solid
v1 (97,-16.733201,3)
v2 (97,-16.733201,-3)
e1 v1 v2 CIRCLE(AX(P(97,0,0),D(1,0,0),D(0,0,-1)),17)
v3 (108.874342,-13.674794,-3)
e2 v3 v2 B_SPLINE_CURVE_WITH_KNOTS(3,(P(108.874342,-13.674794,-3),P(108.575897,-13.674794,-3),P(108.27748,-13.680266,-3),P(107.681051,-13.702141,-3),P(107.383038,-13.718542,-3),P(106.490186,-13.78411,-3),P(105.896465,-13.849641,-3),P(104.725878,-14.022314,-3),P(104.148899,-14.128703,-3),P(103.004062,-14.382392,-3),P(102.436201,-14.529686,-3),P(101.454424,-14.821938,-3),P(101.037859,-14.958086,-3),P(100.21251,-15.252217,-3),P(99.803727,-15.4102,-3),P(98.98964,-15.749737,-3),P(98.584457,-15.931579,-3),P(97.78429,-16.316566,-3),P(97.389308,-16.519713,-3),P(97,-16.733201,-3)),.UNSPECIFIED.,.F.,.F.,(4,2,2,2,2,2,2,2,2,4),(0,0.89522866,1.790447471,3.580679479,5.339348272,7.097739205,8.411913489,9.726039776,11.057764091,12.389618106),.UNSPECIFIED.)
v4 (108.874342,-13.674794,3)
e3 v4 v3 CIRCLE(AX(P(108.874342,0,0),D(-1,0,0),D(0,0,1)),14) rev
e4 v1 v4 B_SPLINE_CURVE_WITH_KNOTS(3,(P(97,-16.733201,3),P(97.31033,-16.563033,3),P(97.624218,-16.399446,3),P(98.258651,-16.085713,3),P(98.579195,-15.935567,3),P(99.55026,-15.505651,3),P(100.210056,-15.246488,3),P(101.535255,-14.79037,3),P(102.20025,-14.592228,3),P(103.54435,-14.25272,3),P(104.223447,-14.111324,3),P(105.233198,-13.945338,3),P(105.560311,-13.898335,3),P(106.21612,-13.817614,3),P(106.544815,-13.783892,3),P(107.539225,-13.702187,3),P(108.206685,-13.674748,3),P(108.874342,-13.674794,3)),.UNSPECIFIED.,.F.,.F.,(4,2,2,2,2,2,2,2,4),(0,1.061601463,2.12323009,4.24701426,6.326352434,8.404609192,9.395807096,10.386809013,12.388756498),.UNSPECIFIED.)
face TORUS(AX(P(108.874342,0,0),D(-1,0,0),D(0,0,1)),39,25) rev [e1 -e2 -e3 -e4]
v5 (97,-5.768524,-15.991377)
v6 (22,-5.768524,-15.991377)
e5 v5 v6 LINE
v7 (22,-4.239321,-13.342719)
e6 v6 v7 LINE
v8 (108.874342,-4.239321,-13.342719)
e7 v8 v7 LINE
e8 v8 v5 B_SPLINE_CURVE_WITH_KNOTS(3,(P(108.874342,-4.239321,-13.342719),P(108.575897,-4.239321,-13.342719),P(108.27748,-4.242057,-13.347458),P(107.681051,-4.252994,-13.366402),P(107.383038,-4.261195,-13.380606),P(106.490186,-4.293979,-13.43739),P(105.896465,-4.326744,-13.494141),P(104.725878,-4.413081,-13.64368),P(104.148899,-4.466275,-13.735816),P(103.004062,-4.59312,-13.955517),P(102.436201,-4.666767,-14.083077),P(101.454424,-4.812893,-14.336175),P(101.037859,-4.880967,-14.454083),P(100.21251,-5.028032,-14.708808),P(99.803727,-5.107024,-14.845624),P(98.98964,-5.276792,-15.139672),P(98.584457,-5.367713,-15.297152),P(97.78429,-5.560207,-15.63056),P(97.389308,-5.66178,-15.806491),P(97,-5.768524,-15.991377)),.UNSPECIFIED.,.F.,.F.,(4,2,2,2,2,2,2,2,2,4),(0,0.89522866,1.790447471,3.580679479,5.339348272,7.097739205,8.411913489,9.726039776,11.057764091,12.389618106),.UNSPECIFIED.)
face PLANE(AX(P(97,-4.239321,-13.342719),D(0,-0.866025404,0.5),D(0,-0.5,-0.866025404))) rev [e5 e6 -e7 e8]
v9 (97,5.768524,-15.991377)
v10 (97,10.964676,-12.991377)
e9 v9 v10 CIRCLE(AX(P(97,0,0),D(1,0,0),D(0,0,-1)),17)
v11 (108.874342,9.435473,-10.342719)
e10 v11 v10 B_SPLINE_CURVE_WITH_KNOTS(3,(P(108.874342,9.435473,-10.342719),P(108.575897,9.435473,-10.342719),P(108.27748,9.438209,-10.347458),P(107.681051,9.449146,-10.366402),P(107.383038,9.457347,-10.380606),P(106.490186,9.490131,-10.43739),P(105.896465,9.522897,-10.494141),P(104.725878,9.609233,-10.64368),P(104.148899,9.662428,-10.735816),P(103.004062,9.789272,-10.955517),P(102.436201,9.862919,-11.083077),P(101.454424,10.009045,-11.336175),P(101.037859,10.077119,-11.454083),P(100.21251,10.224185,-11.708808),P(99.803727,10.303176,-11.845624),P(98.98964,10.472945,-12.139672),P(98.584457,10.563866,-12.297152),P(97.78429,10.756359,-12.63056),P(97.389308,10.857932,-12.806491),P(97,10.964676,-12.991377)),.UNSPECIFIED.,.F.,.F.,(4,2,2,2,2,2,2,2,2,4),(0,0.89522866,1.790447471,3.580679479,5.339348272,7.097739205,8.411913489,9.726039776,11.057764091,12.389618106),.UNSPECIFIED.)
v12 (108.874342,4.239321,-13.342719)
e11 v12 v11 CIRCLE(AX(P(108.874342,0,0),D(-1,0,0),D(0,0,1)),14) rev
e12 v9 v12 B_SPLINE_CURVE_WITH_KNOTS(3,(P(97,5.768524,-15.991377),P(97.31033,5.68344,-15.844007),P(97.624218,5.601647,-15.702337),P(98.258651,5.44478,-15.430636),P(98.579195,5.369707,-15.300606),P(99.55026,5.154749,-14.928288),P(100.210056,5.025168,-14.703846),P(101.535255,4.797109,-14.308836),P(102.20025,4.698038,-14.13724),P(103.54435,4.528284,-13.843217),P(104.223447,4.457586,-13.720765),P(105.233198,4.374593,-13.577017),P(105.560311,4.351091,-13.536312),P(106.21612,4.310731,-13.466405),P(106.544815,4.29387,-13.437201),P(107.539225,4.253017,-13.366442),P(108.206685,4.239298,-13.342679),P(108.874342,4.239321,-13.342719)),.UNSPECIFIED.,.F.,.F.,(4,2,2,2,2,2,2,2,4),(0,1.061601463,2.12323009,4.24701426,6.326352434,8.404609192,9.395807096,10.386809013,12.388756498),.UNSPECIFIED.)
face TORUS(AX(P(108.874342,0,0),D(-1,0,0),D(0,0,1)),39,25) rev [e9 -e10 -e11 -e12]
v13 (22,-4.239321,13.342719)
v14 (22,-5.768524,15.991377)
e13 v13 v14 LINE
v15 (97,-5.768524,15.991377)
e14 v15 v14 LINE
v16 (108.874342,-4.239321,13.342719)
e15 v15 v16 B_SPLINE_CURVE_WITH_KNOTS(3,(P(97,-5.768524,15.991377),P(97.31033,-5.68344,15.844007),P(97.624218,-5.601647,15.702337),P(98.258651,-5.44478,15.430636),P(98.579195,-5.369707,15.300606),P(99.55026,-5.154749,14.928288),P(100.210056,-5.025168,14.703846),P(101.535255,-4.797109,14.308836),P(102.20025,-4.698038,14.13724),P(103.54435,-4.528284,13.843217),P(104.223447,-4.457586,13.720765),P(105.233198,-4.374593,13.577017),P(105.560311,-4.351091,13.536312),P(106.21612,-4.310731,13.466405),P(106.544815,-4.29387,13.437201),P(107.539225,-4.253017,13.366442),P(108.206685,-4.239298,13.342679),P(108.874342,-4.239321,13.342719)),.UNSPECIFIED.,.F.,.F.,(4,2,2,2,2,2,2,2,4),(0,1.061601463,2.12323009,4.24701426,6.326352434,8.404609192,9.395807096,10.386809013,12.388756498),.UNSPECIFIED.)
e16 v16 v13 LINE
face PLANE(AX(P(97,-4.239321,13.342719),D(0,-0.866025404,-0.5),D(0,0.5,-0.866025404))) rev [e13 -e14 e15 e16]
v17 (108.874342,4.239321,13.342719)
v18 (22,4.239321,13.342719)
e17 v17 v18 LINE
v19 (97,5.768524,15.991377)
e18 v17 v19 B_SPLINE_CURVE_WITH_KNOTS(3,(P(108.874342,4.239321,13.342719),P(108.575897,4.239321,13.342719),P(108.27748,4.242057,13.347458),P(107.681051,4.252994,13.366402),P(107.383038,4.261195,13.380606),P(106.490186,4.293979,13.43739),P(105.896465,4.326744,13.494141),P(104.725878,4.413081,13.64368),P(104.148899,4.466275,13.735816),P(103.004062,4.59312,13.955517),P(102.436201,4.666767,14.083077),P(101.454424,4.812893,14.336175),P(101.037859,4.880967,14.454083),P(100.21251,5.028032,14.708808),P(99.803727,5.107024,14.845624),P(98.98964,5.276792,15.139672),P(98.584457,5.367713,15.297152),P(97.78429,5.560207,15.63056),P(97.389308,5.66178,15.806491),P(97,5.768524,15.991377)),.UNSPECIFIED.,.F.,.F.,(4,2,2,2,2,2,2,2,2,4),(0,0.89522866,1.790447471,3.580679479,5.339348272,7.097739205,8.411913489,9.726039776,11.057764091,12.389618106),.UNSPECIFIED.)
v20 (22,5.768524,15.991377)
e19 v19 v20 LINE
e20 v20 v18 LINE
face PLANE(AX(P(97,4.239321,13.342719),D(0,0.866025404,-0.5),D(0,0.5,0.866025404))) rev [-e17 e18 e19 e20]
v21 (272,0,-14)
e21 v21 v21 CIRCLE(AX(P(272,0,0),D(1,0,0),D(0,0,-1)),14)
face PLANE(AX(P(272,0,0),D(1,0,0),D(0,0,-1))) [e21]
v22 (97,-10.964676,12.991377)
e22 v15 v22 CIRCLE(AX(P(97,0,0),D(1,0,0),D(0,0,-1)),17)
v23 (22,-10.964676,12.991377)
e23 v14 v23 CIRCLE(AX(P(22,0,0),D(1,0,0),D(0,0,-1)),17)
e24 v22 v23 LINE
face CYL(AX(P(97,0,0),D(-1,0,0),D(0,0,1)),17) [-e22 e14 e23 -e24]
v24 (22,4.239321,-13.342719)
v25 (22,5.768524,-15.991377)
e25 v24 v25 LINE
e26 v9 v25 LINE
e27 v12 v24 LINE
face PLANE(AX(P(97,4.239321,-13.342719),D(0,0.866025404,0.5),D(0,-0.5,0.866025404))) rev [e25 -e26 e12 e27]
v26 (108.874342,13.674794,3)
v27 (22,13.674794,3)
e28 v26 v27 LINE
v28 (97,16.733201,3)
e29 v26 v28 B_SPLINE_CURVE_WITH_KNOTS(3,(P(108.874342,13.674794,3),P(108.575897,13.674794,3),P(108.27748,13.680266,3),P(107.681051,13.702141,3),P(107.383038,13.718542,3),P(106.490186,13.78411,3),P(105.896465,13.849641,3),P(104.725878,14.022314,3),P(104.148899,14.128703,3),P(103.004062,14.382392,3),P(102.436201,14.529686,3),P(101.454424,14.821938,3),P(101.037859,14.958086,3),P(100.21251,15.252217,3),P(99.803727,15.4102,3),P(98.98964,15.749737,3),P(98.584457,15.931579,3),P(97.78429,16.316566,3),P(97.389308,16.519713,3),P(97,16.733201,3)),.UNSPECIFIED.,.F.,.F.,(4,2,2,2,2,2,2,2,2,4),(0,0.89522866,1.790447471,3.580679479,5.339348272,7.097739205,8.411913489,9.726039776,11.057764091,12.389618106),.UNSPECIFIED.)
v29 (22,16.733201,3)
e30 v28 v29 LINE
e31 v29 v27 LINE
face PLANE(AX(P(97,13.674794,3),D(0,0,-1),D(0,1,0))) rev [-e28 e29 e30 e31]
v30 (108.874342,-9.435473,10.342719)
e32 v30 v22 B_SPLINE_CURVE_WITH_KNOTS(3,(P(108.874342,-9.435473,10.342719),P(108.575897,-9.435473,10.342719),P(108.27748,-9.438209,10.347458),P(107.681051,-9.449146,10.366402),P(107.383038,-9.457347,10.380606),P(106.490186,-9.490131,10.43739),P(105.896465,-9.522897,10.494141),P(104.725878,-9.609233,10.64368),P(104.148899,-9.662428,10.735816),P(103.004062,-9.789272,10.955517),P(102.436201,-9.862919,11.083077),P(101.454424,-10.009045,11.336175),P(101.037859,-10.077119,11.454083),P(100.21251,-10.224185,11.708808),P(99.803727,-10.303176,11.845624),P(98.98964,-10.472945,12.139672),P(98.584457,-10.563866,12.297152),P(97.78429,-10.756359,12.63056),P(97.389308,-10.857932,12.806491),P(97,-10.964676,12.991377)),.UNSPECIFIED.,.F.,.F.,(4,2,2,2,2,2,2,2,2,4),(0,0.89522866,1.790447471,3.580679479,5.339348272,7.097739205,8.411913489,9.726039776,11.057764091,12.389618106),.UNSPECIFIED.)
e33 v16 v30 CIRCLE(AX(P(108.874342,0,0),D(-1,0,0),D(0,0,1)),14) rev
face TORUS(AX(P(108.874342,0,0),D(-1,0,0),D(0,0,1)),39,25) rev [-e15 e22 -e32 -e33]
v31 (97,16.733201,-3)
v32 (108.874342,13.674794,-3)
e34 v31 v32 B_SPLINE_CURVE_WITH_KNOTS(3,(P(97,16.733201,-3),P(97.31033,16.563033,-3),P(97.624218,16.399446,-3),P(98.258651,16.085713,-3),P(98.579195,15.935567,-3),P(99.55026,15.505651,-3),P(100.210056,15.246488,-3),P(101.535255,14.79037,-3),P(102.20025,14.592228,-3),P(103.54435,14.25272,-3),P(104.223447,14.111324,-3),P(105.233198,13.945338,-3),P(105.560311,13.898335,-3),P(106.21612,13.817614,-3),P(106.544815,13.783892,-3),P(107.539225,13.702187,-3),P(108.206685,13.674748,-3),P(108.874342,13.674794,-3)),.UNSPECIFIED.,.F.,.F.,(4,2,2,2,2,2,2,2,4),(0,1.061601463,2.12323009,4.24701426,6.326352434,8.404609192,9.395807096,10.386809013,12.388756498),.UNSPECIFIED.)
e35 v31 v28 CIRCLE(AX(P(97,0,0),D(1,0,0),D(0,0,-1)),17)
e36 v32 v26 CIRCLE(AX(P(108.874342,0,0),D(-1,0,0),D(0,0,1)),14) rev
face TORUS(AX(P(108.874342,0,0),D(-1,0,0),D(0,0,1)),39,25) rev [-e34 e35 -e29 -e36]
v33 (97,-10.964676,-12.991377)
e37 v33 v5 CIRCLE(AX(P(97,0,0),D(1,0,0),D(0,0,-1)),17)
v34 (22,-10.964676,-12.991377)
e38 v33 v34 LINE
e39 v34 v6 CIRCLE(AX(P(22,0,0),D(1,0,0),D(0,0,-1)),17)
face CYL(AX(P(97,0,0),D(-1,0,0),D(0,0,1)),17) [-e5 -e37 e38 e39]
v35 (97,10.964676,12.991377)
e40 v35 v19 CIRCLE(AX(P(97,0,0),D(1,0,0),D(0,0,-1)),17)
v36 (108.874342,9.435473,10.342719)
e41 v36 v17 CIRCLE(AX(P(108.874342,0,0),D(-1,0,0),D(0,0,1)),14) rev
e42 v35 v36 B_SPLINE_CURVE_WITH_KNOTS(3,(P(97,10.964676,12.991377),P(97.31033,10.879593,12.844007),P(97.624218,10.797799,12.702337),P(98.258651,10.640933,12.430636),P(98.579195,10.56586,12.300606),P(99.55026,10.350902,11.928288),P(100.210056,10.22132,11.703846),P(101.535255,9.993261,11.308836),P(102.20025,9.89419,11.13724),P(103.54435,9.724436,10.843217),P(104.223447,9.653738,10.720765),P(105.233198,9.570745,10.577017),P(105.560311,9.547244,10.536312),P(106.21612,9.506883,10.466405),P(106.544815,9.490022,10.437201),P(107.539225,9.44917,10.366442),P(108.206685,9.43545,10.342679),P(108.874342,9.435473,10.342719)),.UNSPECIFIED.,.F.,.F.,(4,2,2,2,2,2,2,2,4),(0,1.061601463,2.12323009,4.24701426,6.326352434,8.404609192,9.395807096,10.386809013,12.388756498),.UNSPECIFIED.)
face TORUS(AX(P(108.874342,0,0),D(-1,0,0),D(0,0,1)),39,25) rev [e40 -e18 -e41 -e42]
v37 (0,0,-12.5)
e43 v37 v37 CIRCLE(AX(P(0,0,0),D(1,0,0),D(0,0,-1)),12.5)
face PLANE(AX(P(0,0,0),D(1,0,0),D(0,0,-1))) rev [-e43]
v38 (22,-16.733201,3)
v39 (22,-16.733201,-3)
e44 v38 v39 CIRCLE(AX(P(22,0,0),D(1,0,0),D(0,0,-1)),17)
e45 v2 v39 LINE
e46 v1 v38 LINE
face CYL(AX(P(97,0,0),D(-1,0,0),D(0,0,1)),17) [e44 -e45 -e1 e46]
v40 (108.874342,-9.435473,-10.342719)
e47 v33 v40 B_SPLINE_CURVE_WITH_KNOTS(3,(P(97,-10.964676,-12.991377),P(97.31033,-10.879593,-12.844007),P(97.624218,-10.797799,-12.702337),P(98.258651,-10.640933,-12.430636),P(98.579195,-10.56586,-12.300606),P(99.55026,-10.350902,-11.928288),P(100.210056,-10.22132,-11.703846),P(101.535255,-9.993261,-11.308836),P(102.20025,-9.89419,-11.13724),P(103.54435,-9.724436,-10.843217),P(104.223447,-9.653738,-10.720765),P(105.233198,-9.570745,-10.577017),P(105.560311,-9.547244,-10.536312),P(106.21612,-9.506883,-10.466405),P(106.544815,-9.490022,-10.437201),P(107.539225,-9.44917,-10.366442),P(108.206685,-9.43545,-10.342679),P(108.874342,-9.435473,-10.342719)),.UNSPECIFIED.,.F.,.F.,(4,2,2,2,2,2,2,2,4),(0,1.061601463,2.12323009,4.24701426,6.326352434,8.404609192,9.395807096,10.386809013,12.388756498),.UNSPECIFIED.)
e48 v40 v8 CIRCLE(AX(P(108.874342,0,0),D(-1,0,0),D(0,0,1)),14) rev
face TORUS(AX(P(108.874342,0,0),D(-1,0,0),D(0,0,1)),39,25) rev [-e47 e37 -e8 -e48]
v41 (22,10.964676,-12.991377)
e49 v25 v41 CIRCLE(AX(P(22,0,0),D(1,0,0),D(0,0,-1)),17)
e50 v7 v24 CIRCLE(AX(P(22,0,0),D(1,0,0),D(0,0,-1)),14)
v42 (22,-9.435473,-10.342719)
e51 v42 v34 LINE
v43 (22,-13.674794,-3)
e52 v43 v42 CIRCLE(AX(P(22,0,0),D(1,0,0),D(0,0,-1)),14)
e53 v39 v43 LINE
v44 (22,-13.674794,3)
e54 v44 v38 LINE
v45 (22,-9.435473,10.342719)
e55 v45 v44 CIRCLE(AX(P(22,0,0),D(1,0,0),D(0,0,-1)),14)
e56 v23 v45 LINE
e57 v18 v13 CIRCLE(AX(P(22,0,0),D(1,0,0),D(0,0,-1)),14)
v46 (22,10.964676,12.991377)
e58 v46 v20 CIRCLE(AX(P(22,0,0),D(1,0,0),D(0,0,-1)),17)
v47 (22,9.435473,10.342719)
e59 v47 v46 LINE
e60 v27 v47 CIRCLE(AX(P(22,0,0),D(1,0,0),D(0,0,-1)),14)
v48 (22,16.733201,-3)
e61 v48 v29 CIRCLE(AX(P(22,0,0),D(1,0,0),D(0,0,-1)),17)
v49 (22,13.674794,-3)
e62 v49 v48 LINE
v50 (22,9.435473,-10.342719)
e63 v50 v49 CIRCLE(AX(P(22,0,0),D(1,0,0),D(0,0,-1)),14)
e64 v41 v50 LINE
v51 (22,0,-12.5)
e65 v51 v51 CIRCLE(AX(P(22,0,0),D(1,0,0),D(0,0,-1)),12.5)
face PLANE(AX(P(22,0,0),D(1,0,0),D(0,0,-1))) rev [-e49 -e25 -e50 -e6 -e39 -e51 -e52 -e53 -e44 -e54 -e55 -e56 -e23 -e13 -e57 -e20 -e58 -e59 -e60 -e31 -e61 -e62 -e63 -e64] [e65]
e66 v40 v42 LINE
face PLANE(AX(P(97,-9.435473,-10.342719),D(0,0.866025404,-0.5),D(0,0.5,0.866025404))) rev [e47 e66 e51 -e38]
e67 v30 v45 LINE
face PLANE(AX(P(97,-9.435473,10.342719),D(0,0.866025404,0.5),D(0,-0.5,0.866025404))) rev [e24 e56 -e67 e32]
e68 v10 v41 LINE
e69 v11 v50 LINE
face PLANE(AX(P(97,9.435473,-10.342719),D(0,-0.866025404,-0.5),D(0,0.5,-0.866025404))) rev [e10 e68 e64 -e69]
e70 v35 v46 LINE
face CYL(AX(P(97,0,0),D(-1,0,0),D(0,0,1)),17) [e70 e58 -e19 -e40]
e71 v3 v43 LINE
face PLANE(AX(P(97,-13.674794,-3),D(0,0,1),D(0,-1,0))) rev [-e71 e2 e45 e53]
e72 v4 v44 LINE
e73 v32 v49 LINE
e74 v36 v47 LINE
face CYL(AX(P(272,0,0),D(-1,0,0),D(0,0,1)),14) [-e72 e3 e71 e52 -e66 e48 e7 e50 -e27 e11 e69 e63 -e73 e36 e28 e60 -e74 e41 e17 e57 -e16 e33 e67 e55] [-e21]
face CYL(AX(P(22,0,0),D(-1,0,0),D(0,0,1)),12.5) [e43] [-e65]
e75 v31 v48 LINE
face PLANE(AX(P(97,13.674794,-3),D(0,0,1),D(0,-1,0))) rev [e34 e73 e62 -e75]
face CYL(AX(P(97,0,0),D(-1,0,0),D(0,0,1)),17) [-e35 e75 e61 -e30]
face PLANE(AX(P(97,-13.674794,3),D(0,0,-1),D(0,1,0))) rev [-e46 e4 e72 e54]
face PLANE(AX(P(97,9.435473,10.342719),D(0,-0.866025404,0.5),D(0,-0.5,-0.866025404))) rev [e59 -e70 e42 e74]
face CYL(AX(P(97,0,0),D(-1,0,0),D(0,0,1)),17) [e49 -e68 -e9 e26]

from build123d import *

# Parameters (mm, degrees)
SKETCH1_R           = 12.5
BOSS_EXTRUDE1_DEPTH = 22
SKETCH3_R           = 14
BOSS_EXTRUDE2_DEPTH = 250
BOSS_EXTRUDE3_DEPTH = 75
FILLET3_R           = 25


with BuildPart() as part:
    # Sketch1 → Boss-Extrude1 (new body)
    with BuildSketch(Plane(origin=(0, 0, 0), x_dir=(0, 0, -1), z_dir=(1, 0, 0))):
        Circle(SKETCH1_R)
    extrude(amount=BOSS_EXTRUDE1_DEPTH)

    # Sketch3 → Boss-Extrude2 (add)
    with BuildSketch(Plane(origin=(22, 0, 0), x_dir=(0, 0, -1), z_dir=(1, 0, 0))):
        Circle(SKETCH3_R)
    extrude(amount=BOSS_EXTRUDE2_DEPTH)

    # Sketch2 → Boss-Extrude3 (add)
    with BuildSketch(Plane(origin=(22, 0, 0), x_dir=(0, 0, -1), z_dir=(1, 0, 0))):
        with BuildLine():
            Line((-13.342719282, -4.239320954), (-15.991376746, -5.768524054))
            ThreePointArc((-15.991376746, -5.768524054), (-14.722431864, -8.5), (-12.991376746, -10.964676477))
            Line((-12.991376746, -10.964676477), (-10.342719282, -9.435473377))
            ThreePointArc((-10.342719282, -9.435473377), (-7, -12.124355653), (-3, -13.674794331))
            Line((-3, -13.674794331), (-3, -16.733200531))
            ThreePointArc((-3, -16.733200531), (0, -17), (3, -16.733200531))
            Line((3, -16.733200531), (3, -13.674794331))
            ThreePointArc((3, -13.674794331), (7, -12.124355653), (10.342719282, -9.435473377))
            Line((10.342719282, -9.435473377), (12.991376746, -10.964676477))
            ThreePointArc((12.991376746, -10.964676477), (14.722431864, -8.5), (15.991376746, -5.768524054))
            Line((15.991376746, -5.768524054), (13.342719282, -4.239320954))
            ThreePointArc((13.342719282, -4.239320954), (14, 0), (13.342719282, 4.239320954))
            Line((13.342719282, 4.239320954), (15.991376746, 5.768524054))
            ThreePointArc((15.991376746, 5.768524054), (14.722431864, 8.5), (12.991376746, 10.964676477))
            Line((12.991376746, 10.964676477), (10.342719282, 9.435473377))
            ThreePointArc((10.342719282, 9.435473377), (7, 12.124355653), (3, 13.674794331))
            Line((3, 13.674794331), (3, 16.733200531))
            ThreePointArc((3, 16.733200531), (0, 17), (-3, 16.733200531))
            Line((-3, 16.733200531), (-3, 13.674794331))
            ThreePointArc((-3, 13.674794331), (-7, 12.124355653), (-10.342719282, 9.435473377))
            Line((-10.342719282, 9.435473377), (-12.991376746, 10.964676477))
            ThreePointArc((-12.991376746, 10.964676477), (-14.722431864, 8.5), (-15.991376746, 5.768524054))
            Line((-15.991376746, 5.768524054), (-13.342719282, 4.239320954))
            ThreePointArc((-13.342719282, 4.239320954), (-14, 0), (-13.342719282, -4.239320954))
        make_face()
    extrude(amount=BOSS_EXTRUDE3_DEPTH)

    # Fillet3
    # the kernel refuses this fillet: 25 mm, written as the material it adds along each edge
    with BuildSketch(Plane(origin=(97, 0, 0), x_dir=(0, 0.27784568580579977, 0.960625720496336), z_dir=(0, -0.960625720496336, 0.27784568580579977))) as fillet3_piece_1_section:
        with BuildLine():
            CenterArc((39, -11.874342087), FILLET3_R, 151.642363424, 28.357636576)
            Line((17, 0), (14, 0))
            Line((14, 0), (14, -11.874342087))
        make_face()
    fillet3_piece_1 = revolve(axis=Axis((97, 0, 0), (-1, 0, 0)), revolution_arc=267.736659013, mode=Mode.PRIVATE)
    fillet3_piece_1 = split(fillet3_piece_1, bisect_by=Plane(origin=(97, 2.598076211, -1.5), z_dir=(0, -0.8660254037844357, 0.5000000000000051)), keep=Keep.TOP, mode=Mode.PRIVATE)
    fillet3_piece_1 = split(fillet3_piece_1, bisect_by=Plane(origin=(97, -2.598076211, 1.5), z_dir=(0, 0.8660254037844359, -0.5000000000000047)), keep=Keep.TOP, mode=Mode.PRIVATE)
    add(fillet3_piece_1)
    with BuildSketch(Plane(origin=(97, 0, 0), x_dir=(0, 0.27784568580579977, 0.960625720496336), z_dir=(0, -0.960625720496336, 0.27784568580579977))) as fillet3_piece_2_section:
        with BuildLine():
            CenterArc((39, -11.874342087), FILLET3_R, 151.642363424, 28.357636576)
            Line((17, 0), (14, 0))
            Line((14, 0), (14, -11.874342087))
        make_face()
    fillet3_piece_2 = revolve(axis=Axis((97, 0, 0), (-1, 0, 0)), revolution_arc=267.736659013, mode=Mode.PRIVATE)
    fillet3_piece_2 = split(fillet3_piece_2, bisect_by=Plane(origin=(97, 0, -3), z_dir=(0, 0, 1)), keep=Keep.TOP, mode=Mode.PRIVATE)
    fillet3_piece_2 = split(fillet3_piece_2, bisect_by=Plane(origin=(97, 0, 3), z_dir=(0, 0, -1)), keep=Keep.TOP, mode=Mode.PRIVATE)
    add(fillet3_piece_2)
    with BuildSketch(Plane(origin=(97, 0, 0), x_dir=(0, 0.27784568580579977, 0.960625720496336), z_dir=(0, -0.960625720496336, 0.27784568580579977))) as fillet3_piece_3_section:
        with BuildLine():
            CenterArc((39, -11.874342087), FILLET3_R, 151.642363424, 28.357636576)
            Line((17, 0), (14, 0))
            Line((14, 0), (14, -11.874342087))
        make_face()
    fillet3_piece_3 = revolve(axis=Axis((97, 0, 0), (-1, 0, 0)), revolution_arc=267.736659013, mode=Mode.PRIVATE)
    fillet3_piece_3 = split(fillet3_piece_3, bisect_by=Plane(origin=(97, -2.598076211, -1.5), z_dir=(0, 0.8660254037844438, 0.4999999999999911)), keep=Keep.TOP, mode=Mode.PRIVATE)
    fillet3_piece_3 = split(fillet3_piece_3, bisect_by=Plane(origin=(97, 2.598076211, 1.5), z_dir=(0, -0.8660254037844435, -0.49999999999999156)), keep=Keep.TOP, mode=Mode.PRIVATE)
    add(fillet3_piece_3)
    with BuildSketch(Plane(origin=(97, 0, 0), x_dir=(0, 0.9708491203814568, 0.23969143800843562), z_dir=(0, -0.23969143800843562, 0.9708491203814568))) as fillet3_piece_4_section:
        with BuildLine():
            CenterArc((39, -11.874342087), FILLET3_R, 151.642363424, 28.357636576)
            Line((17, 0), (14, 0))
            Line((14, 0), (14, -11.874342087))
        make_face()
    fillet3_piece_4 = revolve(axis=Axis((97, 0, 0), (-1, 0, 0)), revolution_arc=267.736659013, mode=Mode.PRIVATE)
    fillet3_piece_4 = split(fillet3_piece_4, bisect_by=Plane(origin=(97, 0, -3), z_dir=(0, 0, 1)), keep=Keep.TOP, mode=Mode.PRIVATE)
    fillet3_piece_4 = split(fillet3_piece_4, bisect_by=Plane(origin=(97, 0, 3), z_dir=(0, 0, -1)), keep=Keep.TOP, mode=Mode.PRIVATE)
    add(fillet3_piece_4)
    with BuildSketch(Plane(origin=(97, 0, 0), x_dir=(0, 0.9708491203814568, 0.23969143800843562), z_dir=(0, -0.23969143800843562, 0.9708491203814568))) as fillet3_piece_5_section:
        with BuildLine():
            CenterArc((39, -11.874342087), FILLET3_R, 151.642363424, 28.357636576)
            Line((17, 0), (14, 0))
            Line((14, 0), (14, -11.874342087))
        make_face()
    fillet3_piece_5 = revolve(axis=Axis((97, 0, 0), (-1, 0, 0)), revolution_arc=267.736659013, mode=Mode.PRIVATE)
    fillet3_piece_5 = split(fillet3_piece_5, bisect_by=Plane(origin=(97, -2.598076211, -1.5), z_dir=(0, 0.8660254037844438, 0.4999999999999911)), keep=Keep.TOP, mode=Mode.PRIVATE)
    fillet3_piece_5 = split(fillet3_piece_5, bisect_by=Plane(origin=(97, 2.598076211, 1.5), z_dir=(0, -0.8660254037844435, -0.49999999999999156)), keep=Keep.TOP, mode=Mode.PRIVATE)
    add(fillet3_piece_5)
    with BuildSketch(Plane(origin=(97, 0, 0), x_dir=(0, 0.9708491203814568, 0.23969143800843562), z_dir=(0, -0.23969143800843562, 0.9708491203814568))) as fillet3_piece_6_section:
        with BuildLine():
            CenterArc((39, -11.874342087), FILLET3_R, 151.642363424, 28.357636576)
            Line((17, 0), (14, 0))
            Line((14, 0), (14, -11.874342087))
        make_face()
    fillet3_piece_6 = revolve(axis=Axis((97, 0, 0), (-1, 0, 0)), revolution_arc=267.736659013, mode=Mode.PRIVATE)
    fillet3_piece_6 = split(fillet3_piece_6, bisect_by=Plane(origin=(97, -2.598076211, 1.5), z_dir=(0, 0.8660254037844325, -0.5000000000000107)), keep=Keep.TOP, mode=Mode.PRIVATE)
    fillet3_piece_6 = split(fillet3_piece_6, bisect_by=Plane(origin=(97, 2.598076211, -1.5), z_dir=(0, -0.8660254037844329, 0.5000000000000101)), keep=Keep.TOP, mode=Mode.PRIVATE)
    add(fillet3_piece_6)
    with BuildSketch(Plane(origin=(97, 0, 0), x_dir=(0, 0.6930034345756666, -0.7209342824878907), z_dir=(0, 0.7209342824878907, 0.6930034345756666))) as fillet3_piece_7_section:
        with BuildLine():
            CenterArc((39, -11.874342087), FILLET3_R, 151.642363424, 28.357636576)
            Line((17, 0), (14, 0))
            Line((14, 0), (14, -11.874342087))
        make_face()
    fillet3_piece_7 = revolve(axis=Axis((97, 0, 0), (-1, 0, 0)), revolution_arc=267.736659013, mode=Mode.PRIVATE)
    fillet3_piece_7 = split(fillet3_piece_7, bisect_by=Plane(origin=(97, -2.598076211, -1.5), z_dir=(0, 0.8660254037844438, 0.4999999999999911)), keep=Keep.TOP, mode=Mode.PRIVATE)
    fillet3_piece_7 = split(fillet3_piece_7, bisect_by=Plane(origin=(97, 2.598076211, 1.5), z_dir=(0, -0.8660254037844435, -0.49999999999999156)), keep=Keep.TOP, mode=Mode.PRIVATE)
    add(fillet3_piece_7)
    with BuildSketch(Plane(origin=(97, 0, 0), x_dir=(0, 0.6930034345756666, -0.7209342824878907), z_dir=(0, 0.7209342824878907, 0.6930034345756666))) as fillet3_piece_8_section:
        with BuildLine():
            CenterArc((39, -11.874342087), FILLET3_R, 151.642363424, 28.357636576)
            Line((17, 0), (14, 0))
            Line((14, 0), (14, -11.874342087))
        make_face()
    fillet3_piece_8 = revolve(axis=Axis((97, 0, 0), (-1, 0, 0)), revolution_arc=267.736659013, mode=Mode.PRIVATE)
    fillet3_piece_8 = split(fillet3_piece_8, bisect_by=Plane(origin=(97, 2.598076211, -1.5), z_dir=(0, -0.8660254037844357, 0.5000000000000051)), keep=Keep.TOP, mode=Mode.PRIVATE)
    fillet3_piece_8 = split(fillet3_piece_8, bisect_by=Plane(origin=(97, -2.598076211, 1.5), z_dir=(0, 0.8660254037844359, -0.5000000000000047)), keep=Keep.TOP, mode=Mode.PRIVATE)
    add(fillet3_piece_8)
    with BuildSketch(Plane(origin=(97, 0, 0), x_dir=(0, 0.6930034345756666, -0.7209342824878907), z_dir=(0, 0.7209342824878907, 0.6930034345756666))) as fillet3_piece_9_section:
        with BuildLine():
            CenterArc((39, -11.874342087), FILLET3_R, 151.642363424, 28.357636576)
            Line((17, 0), (14, 0))
            Line((14, 0), (14, -11.874342087))
        make_face()
    fillet3_piece_9 = revolve(axis=Axis((97, 0, 0), (-1, 0, 0)), revolution_arc=267.736659013, mode=Mode.PRIVATE)
    fillet3_piece_9 = split(fillet3_piece_9, bisect_by=Plane(origin=(97, 0, 3), z_dir=(0, 0, -1)), keep=Keep.TOP, mode=Mode.PRIVATE)
    fillet3_piece_9 = split(fillet3_piece_9, bisect_by=Plane(origin=(97, 0, -3), z_dir=(0, 0, 1)), keep=Keep.TOP, mode=Mode.PRIVATE)
    add(fillet3_piece_9)
    with BuildSketch(Plane(origin=(97, 0, 0), x_dir=(0, -0.2778456858057889, -0.9606257204963392), z_dir=(0, 0.9606257204963392, -0.2778456858057889))) as fillet3_piece_10_section:
        with BuildLine():
            CenterArc((39, -11.874342087), FILLET3_R, 151.642363424, 28.357636576)
            Line((17, 0), (14, 0))
            Line((14, 0), (14, -11.874342087))
        make_face()
    fillet3_piece_10 = revolve(axis=Axis((97, 0, 0), (-1, 0, 0)), revolution_arc=267.736659013, mode=Mode.PRIVATE)
    fillet3_piece_10 = split(fillet3_piece_10, bisect_by=Plane(origin=(97, 2.598076211, -1.5), z_dir=(0, -0.8660254037844357, 0.5000000000000051)), keep=Keep.TOP, mode=Mode.PRIVATE)
    fillet3_piece_10 = split(fillet3_piece_10, bisect_by=Plane(origin=(97, -2.598076211, 1.5), z_dir=(0, 0.8660254037844359, -0.5000000000000047)), keep=Keep.TOP, mode=Mode.PRIVATE)
    add(fillet3_piece_10)
    with BuildSketch(Plane(origin=(97, 0, 0), x_dir=(0, -0.2778456858057889, -0.9606257204963392), z_dir=(0, 0.9606257204963392, -0.2778456858057889))) as fillet3_piece_11_section:
        with BuildLine():
            CenterArc((39, -11.874342087), FILLET3_R, 151.642363424, 28.357636576)
            Line((17, 0), (14, 0))
            Line((14, 0), (14, -11.874342087))
        make_face()
    fillet3_piece_11 = revolve(axis=Axis((97, 0, 0), (-1, 0, 0)), revolution_arc=267.736659013, mode=Mode.PRIVATE)
    fillet3_piece_11 = split(fillet3_piece_11, bisect_by=Plane(origin=(97, 0, -3), z_dir=(0, 0, 1)), keep=Keep.TOP, mode=Mode.PRIVATE)
    fillet3_piece_11 = split(fillet3_piece_11, bisect_by=Plane(origin=(97, 0, 3), z_dir=(0, 0, -1)), keep=Keep.TOP, mode=Mode.PRIVATE)
    add(fillet3_piece_11)
    with BuildSketch(Plane(origin=(97, 0, 0), x_dir=(0, -0.2778456858057889, -0.9606257204963392), z_dir=(0, 0.9606257204963392, -0.2778456858057889))) as fillet3_piece_12_section:
        with BuildLine():
            CenterArc((39, -11.874342087), FILLET3_R, 151.642363424, 28.357636576)
            Line((17, 0), (14, 0))
            Line((14, 0), (14, -11.874342087))
        make_face()
    fillet3_piece_12 = revolve(axis=Axis((97, 0, 0), (-1, 0, 0)), revolution_arc=267.736659013, mode=Mode.PRIVATE)
    fillet3_piece_12 = split(fillet3_piece_12, bisect_by=Plane(origin=(97, 2.598076211, 1.5), z_dir=(0, -0.86602540378444, -0.4999999999999976)), keep=Keep.TOP, mode=Mode.PRIVATE)
    fillet3_piece_12 = split(fillet3_piece_12, bisect_by=Plane(origin=(97, -2.598076211, -1.5), z_dir=(0, 0.86602540378444, 0.49999999999999767)), keep=Keep.TOP, mode=Mode.PRIVATE)
    add(fillet3_piece_12)
    with BuildSketch(Plane(origin=(97, 0, 0), x_dir=(0, -0.9708491203814544, -0.23969143800844478), z_dir=(0, 0.23969143800844478, -0.9708491203814544))) as fillet3_piece_13_section:
        with BuildLine():
            CenterArc((39, -11.874342087), FILLET3_R, 151.642363424, 28.357636576)
            Line((17, 0), (14, 0))
            Line((14, 0), (14, -11.874342087))
        make_face()
    fillet3_piece_13 = revolve(axis=Axis((97, 0, 0), (-1, 0, 0)), revolution_arc=267.736659013, mode=Mode.PRIVATE)
    fillet3_piece_13 = split(fillet3_piece_13, bisect_by=Plane(origin=(97, 0, -3), z_dir=(0, 0, 1)), keep=Keep.TOP, mode=Mode.PRIVATE)
    fillet3_piece_13 = split(fillet3_piece_13, bisect_by=Plane(origin=(97, 0, 3), z_dir=(0, 0, -1)), keep=Keep.TOP, mode=Mode.PRIVATE)
    add(fillet3_piece_13)
    with BuildSketch(Plane(origin=(97, 0, 0), x_dir=(0, -0.9708491203814544, -0.23969143800844478), z_dir=(0, 0.23969143800844478, -0.9708491203814544))) as fillet3_piece_14_section:
        with BuildLine():
            CenterArc((39, -11.874342087), FILLET3_R, 151.642363424, 28.357636576)
            Line((17, 0), (14, 0))
            Line((14, 0), (14, -11.874342087))
        make_face()
    fillet3_piece_14 = revolve(axis=Axis((97, 0, 0), (-1, 0, 0)), revolution_arc=267.736659013, mode=Mode.PRIVATE)
    fillet3_piece_14 = split(fillet3_piece_14, bisect_by=Plane(origin=(97, -2.598076211, -1.5), z_dir=(0, 0.8660254037844438, 0.4999999999999911)), keep=Keep.TOP, mode=Mode.PRIVATE)
    fillet3_piece_14 = split(fillet3_piece_14, bisect_by=Plane(origin=(97, 2.598076211, 1.5), z_dir=(0, -0.8660254037844435, -0.49999999999999156)), keep=Keep.TOP, mode=Mode.PRIVATE)
    add(fillet3_piece_14)
    with BuildSketch(Plane(origin=(97, 0, 0), x_dir=(0, -0.9708491203814544, -0.23969143800844478), z_dir=(0, 0.23969143800844478, -0.9708491203814544))) as fillet3_piece_15_section:
        with BuildLine():
            CenterArc((39, -11.874342087), FILLET3_R, 151.642363424, 28.357636576)
            Line((17, 0), (14, 0))
            Line((14, 0), (14, -11.874342087))
        make_face()
    fillet3_piece_15 = revolve(axis=Axis((97, 0, 0), (-1, 0, 0)), revolution_arc=267.736659013, mode=Mode.PRIVATE)
    fillet3_piece_15 = split(fillet3_piece_15, bisect_by=Plane(origin=(97, 2.598076211, -1.5), z_dir=(0, -0.8660254037844357, 0.5000000000000051)), keep=Keep.TOP, mode=Mode.PRIVATE)
    fillet3_piece_15 = split(fillet3_piece_15, bisect_by=Plane(origin=(97, -2.598076211, 1.5), z_dir=(0, 0.8660254037844359, -0.5000000000000047)), keep=Keep.TOP, mode=Mode.PRIVATE)
    add(fillet3_piece_15)
    with BuildSketch(Plane(origin=(97, 0, 0), x_dir=(0, -0.6930034345756619, 0.7209342824878952), z_dir=(0, -0.7209342824878952, -0.6930034345756619))) as fillet3_piece_16_section:
        with BuildLine():
            CenterArc((39, -11.874342087), FILLET3_R, 151.642363424, 28.357636576)
            Line((17, 0), (14, 0))
            Line((14, 0), (14, -11.874342087))
        make_face()
    fillet3_piece_16 = revolve(axis=Axis((97, 0, 0), (-1, 0, 0)), revolution_arc=267.736659013, mode=Mode.PRIVATE)
    fillet3_piece_16 = split(fillet3_piece_16, bisect_by=Plane(origin=(97, -2.598076211, -1.5), z_dir=(0, 0.8660254037844438, 0.4999999999999911)), keep=Keep.TOP, mode=Mode.PRIVATE)
    fillet3_piece_16 = split(fillet3_piece_16, bisect_by=Plane(origin=(97, 2.598076211, 1.5), z_dir=(0, -0.8660254037844435, -0.49999999999999156)), keep=Keep.TOP, mode=Mode.PRIVATE)
    add(fillet3_piece_16)
    with BuildSketch(Plane(origin=(97, 0, 0), x_dir=(0, -0.6930034345756619, 0.7209342824878952), z_dir=(0, -0.7209342824878952, -0.6930034345756619))) as fillet3_piece_17_section:
        with BuildLine():
            CenterArc((39, -11.874342087), FILLET3_R, 151.642363424, 28.357636576)
            Line((17, 0), (14, 0))
            Line((14, 0), (14, -11.874342087))
        make_face()
    fillet3_piece_17 = revolve(axis=Axis((97, 0, 0), (-1, 0, 0)), revolution_arc=267.736659013, mode=Mode.PRIVATE)
    fillet3_piece_17 = split(fillet3_piece_17, bisect_by=Plane(origin=(97, 2.598076211, -1.5), z_dir=(0, -0.8660254037844357, 0.5000000000000051)), keep=Keep.TOP, mode=Mode.PRIVATE)
    fillet3_piece_17 = split(fillet3_piece_17, bisect_by=Plane(origin=(97, -2.598076211, 1.5), z_dir=(0, 0.8660254037844359, -0.5000000000000047)), keep=Keep.TOP, mode=Mode.PRIVATE)
    add(fillet3_piece_17)
    with BuildSketch(Plane(origin=(97, 0, 0), x_dir=(0, -0.6930034345756619, 0.7209342824878952), z_dir=(0, -0.7209342824878952, -0.6930034345756619))) as fillet3_piece_18_section:
        with BuildLine():
            CenterArc((39, -11.874342087), FILLET3_R, 151.642363424, 28.357636576)
            Line((17, 0), (14, 0))
            Line((14, 0), (14, -11.874342087))
        make_face()
    fillet3_piece_18 = revolve(axis=Axis((97, 0, 0), (-1, 0, 0)), revolution_arc=267.736659013, mode=Mode.PRIVATE)
    fillet3_piece_18 = split(fillet3_piece_18, bisect_by=Plane(origin=(97, 0, -3), z_dir=(0, 0, 1)), keep=Keep.TOP, mode=Mode.PRIVATE)
    fillet3_piece_18 = split(fillet3_piece_18, bisect_by=Plane(origin=(97, 0, 3), z_dir=(0, 0, -1)), keep=Keep.TOP, mode=Mode.PRIVATE)
    add(fillet3_piece_18)


solid = part.part
